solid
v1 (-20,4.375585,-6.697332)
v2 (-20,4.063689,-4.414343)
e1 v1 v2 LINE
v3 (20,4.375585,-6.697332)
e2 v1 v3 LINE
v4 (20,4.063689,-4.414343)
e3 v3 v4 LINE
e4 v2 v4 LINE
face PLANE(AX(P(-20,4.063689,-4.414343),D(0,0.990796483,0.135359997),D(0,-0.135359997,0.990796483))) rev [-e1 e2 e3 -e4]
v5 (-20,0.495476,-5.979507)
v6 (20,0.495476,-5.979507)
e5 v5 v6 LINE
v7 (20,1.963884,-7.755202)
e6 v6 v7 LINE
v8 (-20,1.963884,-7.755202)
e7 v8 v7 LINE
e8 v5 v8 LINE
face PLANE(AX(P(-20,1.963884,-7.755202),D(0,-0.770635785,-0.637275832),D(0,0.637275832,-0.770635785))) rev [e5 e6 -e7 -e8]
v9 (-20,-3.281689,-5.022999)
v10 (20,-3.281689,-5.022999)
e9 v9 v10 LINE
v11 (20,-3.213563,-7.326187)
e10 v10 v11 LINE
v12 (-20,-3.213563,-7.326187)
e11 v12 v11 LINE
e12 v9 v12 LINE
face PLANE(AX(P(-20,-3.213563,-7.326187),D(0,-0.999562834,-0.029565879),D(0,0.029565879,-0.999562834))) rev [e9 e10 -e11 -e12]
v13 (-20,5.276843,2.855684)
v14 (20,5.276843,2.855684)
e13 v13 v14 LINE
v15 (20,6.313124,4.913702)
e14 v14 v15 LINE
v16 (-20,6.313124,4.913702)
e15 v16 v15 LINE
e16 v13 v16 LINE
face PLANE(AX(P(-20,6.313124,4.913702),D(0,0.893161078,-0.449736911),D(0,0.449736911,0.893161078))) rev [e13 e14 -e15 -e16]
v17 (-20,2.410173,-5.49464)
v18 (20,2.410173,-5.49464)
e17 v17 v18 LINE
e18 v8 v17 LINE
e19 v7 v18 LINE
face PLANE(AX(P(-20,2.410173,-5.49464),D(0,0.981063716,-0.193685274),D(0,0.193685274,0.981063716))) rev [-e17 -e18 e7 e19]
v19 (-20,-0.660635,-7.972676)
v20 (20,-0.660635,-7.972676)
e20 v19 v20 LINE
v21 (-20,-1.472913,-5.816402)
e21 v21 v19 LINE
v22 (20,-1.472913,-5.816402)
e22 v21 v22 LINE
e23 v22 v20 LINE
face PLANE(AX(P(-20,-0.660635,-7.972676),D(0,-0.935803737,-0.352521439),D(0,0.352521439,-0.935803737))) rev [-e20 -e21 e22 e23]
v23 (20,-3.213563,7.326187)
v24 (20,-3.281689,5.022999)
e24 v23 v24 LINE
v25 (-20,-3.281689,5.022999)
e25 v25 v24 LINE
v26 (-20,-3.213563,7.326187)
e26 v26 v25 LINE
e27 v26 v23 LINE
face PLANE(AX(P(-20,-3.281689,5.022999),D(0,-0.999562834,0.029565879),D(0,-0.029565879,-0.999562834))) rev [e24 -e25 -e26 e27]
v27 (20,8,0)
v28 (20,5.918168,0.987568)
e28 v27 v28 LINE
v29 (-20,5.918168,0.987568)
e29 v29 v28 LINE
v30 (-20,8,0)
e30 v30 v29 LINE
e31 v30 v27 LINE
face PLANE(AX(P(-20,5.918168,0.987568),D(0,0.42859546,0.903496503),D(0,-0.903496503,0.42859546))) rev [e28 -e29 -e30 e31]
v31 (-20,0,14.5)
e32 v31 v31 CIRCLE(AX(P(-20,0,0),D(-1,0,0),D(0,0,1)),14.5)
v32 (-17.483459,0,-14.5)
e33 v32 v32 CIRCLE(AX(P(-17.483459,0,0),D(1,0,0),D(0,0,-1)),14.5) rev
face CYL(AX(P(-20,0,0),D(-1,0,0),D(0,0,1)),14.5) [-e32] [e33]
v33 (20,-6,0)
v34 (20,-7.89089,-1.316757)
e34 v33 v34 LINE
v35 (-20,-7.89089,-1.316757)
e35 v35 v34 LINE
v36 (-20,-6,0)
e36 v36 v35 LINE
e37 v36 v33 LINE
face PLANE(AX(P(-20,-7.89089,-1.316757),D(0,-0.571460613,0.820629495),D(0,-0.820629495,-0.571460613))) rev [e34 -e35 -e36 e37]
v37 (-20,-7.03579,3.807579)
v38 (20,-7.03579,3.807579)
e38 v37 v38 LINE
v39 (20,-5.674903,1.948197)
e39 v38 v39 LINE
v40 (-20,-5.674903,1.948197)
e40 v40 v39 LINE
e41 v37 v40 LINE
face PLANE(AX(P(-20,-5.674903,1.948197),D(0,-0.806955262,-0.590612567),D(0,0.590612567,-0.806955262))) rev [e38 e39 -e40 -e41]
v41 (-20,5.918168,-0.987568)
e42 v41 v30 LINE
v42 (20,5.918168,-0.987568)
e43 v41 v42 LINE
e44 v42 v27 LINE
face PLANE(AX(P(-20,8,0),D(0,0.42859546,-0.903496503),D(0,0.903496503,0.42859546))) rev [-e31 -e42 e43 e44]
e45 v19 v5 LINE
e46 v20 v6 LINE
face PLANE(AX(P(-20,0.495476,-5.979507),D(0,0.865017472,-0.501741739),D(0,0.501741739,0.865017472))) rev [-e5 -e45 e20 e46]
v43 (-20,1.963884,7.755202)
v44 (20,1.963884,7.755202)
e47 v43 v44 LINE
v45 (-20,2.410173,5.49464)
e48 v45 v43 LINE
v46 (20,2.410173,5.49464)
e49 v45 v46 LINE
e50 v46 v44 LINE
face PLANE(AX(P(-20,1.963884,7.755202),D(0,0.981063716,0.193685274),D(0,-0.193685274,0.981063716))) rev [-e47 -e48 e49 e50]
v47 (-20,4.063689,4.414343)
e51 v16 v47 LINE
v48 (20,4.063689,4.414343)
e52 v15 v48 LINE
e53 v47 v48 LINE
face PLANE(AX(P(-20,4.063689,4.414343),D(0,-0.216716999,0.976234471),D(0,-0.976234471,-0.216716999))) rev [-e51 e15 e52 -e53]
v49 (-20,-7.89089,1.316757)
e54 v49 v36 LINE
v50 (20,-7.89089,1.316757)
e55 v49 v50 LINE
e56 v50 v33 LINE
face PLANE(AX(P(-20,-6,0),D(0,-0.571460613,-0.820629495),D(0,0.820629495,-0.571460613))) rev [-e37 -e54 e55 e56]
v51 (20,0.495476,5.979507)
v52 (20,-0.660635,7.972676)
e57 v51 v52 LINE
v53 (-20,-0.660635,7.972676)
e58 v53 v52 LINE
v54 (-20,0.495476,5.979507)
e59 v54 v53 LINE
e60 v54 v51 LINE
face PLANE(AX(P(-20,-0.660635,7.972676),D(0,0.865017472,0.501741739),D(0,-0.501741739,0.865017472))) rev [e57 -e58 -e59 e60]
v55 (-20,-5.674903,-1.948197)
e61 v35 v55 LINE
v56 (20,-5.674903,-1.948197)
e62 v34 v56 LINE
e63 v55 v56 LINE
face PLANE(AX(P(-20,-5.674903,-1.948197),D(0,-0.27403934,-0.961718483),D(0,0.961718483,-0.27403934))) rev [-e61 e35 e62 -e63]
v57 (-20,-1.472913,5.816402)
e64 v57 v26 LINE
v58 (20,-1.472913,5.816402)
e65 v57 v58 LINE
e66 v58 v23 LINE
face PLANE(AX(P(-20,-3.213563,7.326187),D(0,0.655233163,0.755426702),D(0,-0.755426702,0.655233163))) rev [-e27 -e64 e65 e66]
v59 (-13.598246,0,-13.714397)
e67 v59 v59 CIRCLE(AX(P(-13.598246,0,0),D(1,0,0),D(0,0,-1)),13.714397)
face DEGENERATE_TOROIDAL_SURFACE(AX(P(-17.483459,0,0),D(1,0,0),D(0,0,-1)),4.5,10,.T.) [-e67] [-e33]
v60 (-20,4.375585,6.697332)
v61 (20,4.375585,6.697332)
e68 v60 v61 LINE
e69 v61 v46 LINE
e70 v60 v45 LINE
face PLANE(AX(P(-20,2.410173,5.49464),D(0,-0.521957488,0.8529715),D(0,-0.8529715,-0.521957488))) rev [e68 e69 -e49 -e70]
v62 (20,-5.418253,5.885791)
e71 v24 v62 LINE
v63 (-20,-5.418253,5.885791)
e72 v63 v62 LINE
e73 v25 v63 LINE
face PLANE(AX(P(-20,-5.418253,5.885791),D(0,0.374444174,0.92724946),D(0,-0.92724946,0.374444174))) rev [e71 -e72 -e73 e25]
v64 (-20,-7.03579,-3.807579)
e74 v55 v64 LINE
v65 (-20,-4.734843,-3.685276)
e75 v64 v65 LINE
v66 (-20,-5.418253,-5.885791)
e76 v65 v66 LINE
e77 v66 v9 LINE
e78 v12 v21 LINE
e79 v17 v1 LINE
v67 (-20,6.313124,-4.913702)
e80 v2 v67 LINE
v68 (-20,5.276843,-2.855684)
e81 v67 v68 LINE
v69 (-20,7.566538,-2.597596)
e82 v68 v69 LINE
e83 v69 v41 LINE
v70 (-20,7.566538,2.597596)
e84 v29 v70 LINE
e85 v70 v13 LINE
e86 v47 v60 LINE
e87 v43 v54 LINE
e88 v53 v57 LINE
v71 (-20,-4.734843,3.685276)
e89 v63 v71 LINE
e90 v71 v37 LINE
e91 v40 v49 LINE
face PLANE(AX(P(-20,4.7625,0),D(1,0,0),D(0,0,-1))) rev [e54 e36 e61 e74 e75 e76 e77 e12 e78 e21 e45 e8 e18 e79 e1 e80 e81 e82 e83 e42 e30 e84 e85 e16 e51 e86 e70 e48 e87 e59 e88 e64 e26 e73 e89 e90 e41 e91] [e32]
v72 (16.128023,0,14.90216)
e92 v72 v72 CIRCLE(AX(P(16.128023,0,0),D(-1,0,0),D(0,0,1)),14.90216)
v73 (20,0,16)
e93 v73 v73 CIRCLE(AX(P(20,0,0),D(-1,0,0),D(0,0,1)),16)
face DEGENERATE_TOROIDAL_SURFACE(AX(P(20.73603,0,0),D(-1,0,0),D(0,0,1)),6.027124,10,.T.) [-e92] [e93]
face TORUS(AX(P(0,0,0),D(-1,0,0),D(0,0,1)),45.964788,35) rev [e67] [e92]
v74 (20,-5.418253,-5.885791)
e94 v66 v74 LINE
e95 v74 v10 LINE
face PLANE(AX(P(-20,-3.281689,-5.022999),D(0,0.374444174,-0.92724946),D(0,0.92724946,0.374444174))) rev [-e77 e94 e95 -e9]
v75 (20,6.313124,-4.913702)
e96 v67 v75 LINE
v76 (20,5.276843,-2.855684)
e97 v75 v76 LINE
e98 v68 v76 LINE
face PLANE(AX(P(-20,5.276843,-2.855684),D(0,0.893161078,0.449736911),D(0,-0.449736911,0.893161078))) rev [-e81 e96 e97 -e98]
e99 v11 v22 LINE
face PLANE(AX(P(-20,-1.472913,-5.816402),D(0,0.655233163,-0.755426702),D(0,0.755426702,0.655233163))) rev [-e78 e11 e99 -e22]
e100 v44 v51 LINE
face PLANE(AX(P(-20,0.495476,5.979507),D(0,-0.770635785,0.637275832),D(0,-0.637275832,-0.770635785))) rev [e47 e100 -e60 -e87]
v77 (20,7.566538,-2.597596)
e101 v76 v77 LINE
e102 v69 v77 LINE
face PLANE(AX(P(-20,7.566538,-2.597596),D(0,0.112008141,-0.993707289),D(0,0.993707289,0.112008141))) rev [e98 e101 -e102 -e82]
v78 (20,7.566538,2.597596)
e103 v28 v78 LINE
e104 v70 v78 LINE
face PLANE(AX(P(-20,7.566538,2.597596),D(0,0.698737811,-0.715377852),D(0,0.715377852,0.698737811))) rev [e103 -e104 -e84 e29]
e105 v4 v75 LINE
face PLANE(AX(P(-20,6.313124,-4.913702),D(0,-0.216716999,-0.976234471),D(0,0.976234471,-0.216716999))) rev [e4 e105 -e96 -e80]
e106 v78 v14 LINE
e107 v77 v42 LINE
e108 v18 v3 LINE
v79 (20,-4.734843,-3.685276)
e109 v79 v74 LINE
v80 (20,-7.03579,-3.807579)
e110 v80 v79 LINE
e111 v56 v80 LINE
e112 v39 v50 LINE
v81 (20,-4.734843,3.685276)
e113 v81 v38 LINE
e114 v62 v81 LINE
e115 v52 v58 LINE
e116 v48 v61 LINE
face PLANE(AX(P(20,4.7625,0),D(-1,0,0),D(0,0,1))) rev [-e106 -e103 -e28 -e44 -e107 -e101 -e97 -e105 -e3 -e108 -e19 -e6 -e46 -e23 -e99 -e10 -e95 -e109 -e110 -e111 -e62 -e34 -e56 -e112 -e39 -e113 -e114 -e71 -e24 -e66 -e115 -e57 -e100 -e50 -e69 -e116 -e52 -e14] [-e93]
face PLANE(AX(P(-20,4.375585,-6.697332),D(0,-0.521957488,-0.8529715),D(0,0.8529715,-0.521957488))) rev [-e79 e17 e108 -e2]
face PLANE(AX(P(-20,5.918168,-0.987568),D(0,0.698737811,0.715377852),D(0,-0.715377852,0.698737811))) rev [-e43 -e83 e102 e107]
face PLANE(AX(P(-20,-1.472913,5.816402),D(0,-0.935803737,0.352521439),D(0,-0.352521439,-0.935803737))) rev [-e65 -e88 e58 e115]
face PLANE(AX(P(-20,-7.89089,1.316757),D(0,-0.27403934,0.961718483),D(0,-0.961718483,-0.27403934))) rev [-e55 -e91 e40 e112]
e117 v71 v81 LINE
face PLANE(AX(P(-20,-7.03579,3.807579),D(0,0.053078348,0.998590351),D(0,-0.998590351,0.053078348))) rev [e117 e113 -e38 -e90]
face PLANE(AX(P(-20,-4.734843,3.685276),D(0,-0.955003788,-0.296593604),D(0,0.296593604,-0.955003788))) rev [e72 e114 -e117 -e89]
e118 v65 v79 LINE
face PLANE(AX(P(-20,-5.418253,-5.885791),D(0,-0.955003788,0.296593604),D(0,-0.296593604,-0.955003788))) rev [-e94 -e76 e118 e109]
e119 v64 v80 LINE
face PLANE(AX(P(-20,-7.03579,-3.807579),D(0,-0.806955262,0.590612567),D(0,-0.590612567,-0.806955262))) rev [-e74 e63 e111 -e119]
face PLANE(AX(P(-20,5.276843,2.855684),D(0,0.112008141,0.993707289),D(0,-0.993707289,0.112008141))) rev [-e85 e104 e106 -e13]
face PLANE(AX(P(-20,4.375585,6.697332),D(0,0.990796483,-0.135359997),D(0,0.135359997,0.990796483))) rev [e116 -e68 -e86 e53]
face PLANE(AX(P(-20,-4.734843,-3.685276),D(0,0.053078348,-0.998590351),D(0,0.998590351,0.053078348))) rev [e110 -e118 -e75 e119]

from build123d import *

# Parameters (mm, degrees)
CUT_EXTRUDE1_DEPTH = 46.95650117230423
FILLET1_R          = 10


with BuildPart() as part:
    # Sketch1 → Revolve1 (revolve)
    with BuildSketch(Plane.XY, mode=Mode.PRIVATE) as revolve1_sk:
        with BuildLine():
            Line((-20, 4.7625), (-20, 14.5))
            Line((-20, 14.5), (-15.328636266651278, 14.5))
            ThreePointArc((-15.328636266651278, 14.5), (1.5695766523512105, 11), (18.08622279664887, 16))
            Line((18.08622279664887, 16), (20, 16))
            Line((20, 16), (20, 4.7625))
            Line((20, 4.7625), (16.825, 4.7625))
            Line((16.825, 4.7625), (16.825, 3.96875))
            Line((16.825, 3.96875), (-16.825, 3.96875))
            Line((-16.825, 3.96875), (-16.825, 4.7625))
            Line((-16.825, 4.7625), (-20, 4.7625))
        make_face()
    revolve(revolve1_sk.sketch.rotate(Axis((-20, 0, 0), (1, 0, 0)), 90), axis=Axis((-20, 0, 0), (1, 0, 0)))

    # Sketch2 → Cut-Extrude1 (cut, through all)
    with BuildSketch(Plane(origin=(20, 0, 0), x_dir=(0, 0, -1), z_dir=(1, 0, 0))):
        Polygon((-0.9875675416844027, 5.918167820416334), (0, 8), (0.9875675416844045, 5.918167820416334), (2.5975957536374685, 7.56653793360508), (2.855684358222442, 5.276842507238936), (4.913701701517343, 6.313124075171151), (4.414343464038791, 4.06368942975445), (6.69733182610023, 4.375585264979419), (5.494639959930347, 2.4101725479178207), (7.7552021275146465, 1.9638838971263979), (5.979506958040023, 0.4954760728339973), (7.972675944053363, -0.6606347637786543), (5.8164015956359885, -1.47291292284479), (7.326186613240466, -3.2135633972237505), (5.022998869575178, -3.2816889487345575), (5.885791285385062, -5.418252573005925), (3.685276276138015, -4.7348430563783594), (3.807579144296598, -7.035790009651912), (1.948196815228109, -5.674903450203807), (1.3167567222458805, -7.890890427221779), (8.4e-15, -6), (-1.3167567222458623, -7.8908904272217795), (-1.9481968152280928, -5.674903450203809), (-3.80757914429658, -7.035790009651914), (-3.685276276137998, -4.7348430563783666), (-5.885791285385044, -5.418252573005935), (-5.022998869575163, -3.2816889487345664), (-7.326186613240452, -3.213563397223763), (-5.816401595635977, -1.4729129228448008), (-7.9726759440533534, -0.6606347637786659), (-5.979506958040015, 0.4954760728339881), (-7.75520212751464, 1.9638838971263866), (-5.4946399599303435, 2.4101725479178118), (-6.697331826100229, 4.375585264979409), (-4.41434346403879, 4.063689429754444), (-4.913701701517344, 6.313124075171145), (-2.855684358222442, 5.276842507238932), (-2.5975957536374694, 7.566537933605075), align=None)
    extrude(amount=-CUT_EXTRUDE1_DEPTH, mode=Mode.SUBTRACT)

    # Fillet1
    # the kernel refuses this fillet: 10 mm, written as the material it takes off along each edge
    with BuildSketch(Plane(origin=(18.08622279664887, 0, 0), x_dir=(0, 1.1e-16, 1), z_dir=(0, 1, -1.1e-16))) as fillet1_piece_1:
        with BuildLine():
            CenterArc((6.027123801609688, 2.6498073192975404), FILLET1_R, 332.5612146984912, 23.217826405433588)
            Line((15.999999999999996, 1.913777203351131), (16.1994575239678, 1.8990566010322034))
            ThreePointArc((16.1994575239678, 1.8990566010322034), (16.2, 0.9568886016755656), (16.199999999999996, 0))
            Line((16.199999999999996, 0), (16.17122736238995, -0.10334984455228025))
            ThreePointArc((16.17122736238995, -0.10334984455228025), (15.609829730901891, -1.0681006002986955), (15.079661114712898, -2.050359506983643))
            Line((15.079661114712898, -2.050359506983643), (14.902160383083423, -1.9581993731349918))
        make_face()
    revolve(axis=Axis((18.08622279664887, 0, 0), (1, 0, 0)), mode=Mode.SUBTRACT)
    with BuildSketch(Plane(origin=(-15.328636266651278, 0, 0), x_dir=(0, 1.1e-16, 1), z_dir=(0, 1, -1.1e-16))) as fillet1_piece_2:
        with BuildLine():
            CenterArc((4.5, -2.1548222421926884), FILLET1_R, 0, 22.862521626171226)
            Line((13.714397426275884, 1.7303907597726322), (13.898685374801401, 1.8080950198119385))
            ThreePointArc((13.898685374801401, 1.8080950198119385), (14.277562788256734, 0.9425411788785816), (14.67979879096138, 0.08759220723800709))
            Line((14.67979879096138, 0.08759220723800709), (14.7, 0))
            Line((14.7, 0), (14.7, -2.1548222421926884))
            Line((14.7, -2.1548222421926884), (14.5, -2.1548222421926884))
        make_face()
    revolve(axis=Axis((-15.328636266651278, 0, 0), (1, 0, 0)), mode=Mode.SUBTRACT)


solid = part.part
